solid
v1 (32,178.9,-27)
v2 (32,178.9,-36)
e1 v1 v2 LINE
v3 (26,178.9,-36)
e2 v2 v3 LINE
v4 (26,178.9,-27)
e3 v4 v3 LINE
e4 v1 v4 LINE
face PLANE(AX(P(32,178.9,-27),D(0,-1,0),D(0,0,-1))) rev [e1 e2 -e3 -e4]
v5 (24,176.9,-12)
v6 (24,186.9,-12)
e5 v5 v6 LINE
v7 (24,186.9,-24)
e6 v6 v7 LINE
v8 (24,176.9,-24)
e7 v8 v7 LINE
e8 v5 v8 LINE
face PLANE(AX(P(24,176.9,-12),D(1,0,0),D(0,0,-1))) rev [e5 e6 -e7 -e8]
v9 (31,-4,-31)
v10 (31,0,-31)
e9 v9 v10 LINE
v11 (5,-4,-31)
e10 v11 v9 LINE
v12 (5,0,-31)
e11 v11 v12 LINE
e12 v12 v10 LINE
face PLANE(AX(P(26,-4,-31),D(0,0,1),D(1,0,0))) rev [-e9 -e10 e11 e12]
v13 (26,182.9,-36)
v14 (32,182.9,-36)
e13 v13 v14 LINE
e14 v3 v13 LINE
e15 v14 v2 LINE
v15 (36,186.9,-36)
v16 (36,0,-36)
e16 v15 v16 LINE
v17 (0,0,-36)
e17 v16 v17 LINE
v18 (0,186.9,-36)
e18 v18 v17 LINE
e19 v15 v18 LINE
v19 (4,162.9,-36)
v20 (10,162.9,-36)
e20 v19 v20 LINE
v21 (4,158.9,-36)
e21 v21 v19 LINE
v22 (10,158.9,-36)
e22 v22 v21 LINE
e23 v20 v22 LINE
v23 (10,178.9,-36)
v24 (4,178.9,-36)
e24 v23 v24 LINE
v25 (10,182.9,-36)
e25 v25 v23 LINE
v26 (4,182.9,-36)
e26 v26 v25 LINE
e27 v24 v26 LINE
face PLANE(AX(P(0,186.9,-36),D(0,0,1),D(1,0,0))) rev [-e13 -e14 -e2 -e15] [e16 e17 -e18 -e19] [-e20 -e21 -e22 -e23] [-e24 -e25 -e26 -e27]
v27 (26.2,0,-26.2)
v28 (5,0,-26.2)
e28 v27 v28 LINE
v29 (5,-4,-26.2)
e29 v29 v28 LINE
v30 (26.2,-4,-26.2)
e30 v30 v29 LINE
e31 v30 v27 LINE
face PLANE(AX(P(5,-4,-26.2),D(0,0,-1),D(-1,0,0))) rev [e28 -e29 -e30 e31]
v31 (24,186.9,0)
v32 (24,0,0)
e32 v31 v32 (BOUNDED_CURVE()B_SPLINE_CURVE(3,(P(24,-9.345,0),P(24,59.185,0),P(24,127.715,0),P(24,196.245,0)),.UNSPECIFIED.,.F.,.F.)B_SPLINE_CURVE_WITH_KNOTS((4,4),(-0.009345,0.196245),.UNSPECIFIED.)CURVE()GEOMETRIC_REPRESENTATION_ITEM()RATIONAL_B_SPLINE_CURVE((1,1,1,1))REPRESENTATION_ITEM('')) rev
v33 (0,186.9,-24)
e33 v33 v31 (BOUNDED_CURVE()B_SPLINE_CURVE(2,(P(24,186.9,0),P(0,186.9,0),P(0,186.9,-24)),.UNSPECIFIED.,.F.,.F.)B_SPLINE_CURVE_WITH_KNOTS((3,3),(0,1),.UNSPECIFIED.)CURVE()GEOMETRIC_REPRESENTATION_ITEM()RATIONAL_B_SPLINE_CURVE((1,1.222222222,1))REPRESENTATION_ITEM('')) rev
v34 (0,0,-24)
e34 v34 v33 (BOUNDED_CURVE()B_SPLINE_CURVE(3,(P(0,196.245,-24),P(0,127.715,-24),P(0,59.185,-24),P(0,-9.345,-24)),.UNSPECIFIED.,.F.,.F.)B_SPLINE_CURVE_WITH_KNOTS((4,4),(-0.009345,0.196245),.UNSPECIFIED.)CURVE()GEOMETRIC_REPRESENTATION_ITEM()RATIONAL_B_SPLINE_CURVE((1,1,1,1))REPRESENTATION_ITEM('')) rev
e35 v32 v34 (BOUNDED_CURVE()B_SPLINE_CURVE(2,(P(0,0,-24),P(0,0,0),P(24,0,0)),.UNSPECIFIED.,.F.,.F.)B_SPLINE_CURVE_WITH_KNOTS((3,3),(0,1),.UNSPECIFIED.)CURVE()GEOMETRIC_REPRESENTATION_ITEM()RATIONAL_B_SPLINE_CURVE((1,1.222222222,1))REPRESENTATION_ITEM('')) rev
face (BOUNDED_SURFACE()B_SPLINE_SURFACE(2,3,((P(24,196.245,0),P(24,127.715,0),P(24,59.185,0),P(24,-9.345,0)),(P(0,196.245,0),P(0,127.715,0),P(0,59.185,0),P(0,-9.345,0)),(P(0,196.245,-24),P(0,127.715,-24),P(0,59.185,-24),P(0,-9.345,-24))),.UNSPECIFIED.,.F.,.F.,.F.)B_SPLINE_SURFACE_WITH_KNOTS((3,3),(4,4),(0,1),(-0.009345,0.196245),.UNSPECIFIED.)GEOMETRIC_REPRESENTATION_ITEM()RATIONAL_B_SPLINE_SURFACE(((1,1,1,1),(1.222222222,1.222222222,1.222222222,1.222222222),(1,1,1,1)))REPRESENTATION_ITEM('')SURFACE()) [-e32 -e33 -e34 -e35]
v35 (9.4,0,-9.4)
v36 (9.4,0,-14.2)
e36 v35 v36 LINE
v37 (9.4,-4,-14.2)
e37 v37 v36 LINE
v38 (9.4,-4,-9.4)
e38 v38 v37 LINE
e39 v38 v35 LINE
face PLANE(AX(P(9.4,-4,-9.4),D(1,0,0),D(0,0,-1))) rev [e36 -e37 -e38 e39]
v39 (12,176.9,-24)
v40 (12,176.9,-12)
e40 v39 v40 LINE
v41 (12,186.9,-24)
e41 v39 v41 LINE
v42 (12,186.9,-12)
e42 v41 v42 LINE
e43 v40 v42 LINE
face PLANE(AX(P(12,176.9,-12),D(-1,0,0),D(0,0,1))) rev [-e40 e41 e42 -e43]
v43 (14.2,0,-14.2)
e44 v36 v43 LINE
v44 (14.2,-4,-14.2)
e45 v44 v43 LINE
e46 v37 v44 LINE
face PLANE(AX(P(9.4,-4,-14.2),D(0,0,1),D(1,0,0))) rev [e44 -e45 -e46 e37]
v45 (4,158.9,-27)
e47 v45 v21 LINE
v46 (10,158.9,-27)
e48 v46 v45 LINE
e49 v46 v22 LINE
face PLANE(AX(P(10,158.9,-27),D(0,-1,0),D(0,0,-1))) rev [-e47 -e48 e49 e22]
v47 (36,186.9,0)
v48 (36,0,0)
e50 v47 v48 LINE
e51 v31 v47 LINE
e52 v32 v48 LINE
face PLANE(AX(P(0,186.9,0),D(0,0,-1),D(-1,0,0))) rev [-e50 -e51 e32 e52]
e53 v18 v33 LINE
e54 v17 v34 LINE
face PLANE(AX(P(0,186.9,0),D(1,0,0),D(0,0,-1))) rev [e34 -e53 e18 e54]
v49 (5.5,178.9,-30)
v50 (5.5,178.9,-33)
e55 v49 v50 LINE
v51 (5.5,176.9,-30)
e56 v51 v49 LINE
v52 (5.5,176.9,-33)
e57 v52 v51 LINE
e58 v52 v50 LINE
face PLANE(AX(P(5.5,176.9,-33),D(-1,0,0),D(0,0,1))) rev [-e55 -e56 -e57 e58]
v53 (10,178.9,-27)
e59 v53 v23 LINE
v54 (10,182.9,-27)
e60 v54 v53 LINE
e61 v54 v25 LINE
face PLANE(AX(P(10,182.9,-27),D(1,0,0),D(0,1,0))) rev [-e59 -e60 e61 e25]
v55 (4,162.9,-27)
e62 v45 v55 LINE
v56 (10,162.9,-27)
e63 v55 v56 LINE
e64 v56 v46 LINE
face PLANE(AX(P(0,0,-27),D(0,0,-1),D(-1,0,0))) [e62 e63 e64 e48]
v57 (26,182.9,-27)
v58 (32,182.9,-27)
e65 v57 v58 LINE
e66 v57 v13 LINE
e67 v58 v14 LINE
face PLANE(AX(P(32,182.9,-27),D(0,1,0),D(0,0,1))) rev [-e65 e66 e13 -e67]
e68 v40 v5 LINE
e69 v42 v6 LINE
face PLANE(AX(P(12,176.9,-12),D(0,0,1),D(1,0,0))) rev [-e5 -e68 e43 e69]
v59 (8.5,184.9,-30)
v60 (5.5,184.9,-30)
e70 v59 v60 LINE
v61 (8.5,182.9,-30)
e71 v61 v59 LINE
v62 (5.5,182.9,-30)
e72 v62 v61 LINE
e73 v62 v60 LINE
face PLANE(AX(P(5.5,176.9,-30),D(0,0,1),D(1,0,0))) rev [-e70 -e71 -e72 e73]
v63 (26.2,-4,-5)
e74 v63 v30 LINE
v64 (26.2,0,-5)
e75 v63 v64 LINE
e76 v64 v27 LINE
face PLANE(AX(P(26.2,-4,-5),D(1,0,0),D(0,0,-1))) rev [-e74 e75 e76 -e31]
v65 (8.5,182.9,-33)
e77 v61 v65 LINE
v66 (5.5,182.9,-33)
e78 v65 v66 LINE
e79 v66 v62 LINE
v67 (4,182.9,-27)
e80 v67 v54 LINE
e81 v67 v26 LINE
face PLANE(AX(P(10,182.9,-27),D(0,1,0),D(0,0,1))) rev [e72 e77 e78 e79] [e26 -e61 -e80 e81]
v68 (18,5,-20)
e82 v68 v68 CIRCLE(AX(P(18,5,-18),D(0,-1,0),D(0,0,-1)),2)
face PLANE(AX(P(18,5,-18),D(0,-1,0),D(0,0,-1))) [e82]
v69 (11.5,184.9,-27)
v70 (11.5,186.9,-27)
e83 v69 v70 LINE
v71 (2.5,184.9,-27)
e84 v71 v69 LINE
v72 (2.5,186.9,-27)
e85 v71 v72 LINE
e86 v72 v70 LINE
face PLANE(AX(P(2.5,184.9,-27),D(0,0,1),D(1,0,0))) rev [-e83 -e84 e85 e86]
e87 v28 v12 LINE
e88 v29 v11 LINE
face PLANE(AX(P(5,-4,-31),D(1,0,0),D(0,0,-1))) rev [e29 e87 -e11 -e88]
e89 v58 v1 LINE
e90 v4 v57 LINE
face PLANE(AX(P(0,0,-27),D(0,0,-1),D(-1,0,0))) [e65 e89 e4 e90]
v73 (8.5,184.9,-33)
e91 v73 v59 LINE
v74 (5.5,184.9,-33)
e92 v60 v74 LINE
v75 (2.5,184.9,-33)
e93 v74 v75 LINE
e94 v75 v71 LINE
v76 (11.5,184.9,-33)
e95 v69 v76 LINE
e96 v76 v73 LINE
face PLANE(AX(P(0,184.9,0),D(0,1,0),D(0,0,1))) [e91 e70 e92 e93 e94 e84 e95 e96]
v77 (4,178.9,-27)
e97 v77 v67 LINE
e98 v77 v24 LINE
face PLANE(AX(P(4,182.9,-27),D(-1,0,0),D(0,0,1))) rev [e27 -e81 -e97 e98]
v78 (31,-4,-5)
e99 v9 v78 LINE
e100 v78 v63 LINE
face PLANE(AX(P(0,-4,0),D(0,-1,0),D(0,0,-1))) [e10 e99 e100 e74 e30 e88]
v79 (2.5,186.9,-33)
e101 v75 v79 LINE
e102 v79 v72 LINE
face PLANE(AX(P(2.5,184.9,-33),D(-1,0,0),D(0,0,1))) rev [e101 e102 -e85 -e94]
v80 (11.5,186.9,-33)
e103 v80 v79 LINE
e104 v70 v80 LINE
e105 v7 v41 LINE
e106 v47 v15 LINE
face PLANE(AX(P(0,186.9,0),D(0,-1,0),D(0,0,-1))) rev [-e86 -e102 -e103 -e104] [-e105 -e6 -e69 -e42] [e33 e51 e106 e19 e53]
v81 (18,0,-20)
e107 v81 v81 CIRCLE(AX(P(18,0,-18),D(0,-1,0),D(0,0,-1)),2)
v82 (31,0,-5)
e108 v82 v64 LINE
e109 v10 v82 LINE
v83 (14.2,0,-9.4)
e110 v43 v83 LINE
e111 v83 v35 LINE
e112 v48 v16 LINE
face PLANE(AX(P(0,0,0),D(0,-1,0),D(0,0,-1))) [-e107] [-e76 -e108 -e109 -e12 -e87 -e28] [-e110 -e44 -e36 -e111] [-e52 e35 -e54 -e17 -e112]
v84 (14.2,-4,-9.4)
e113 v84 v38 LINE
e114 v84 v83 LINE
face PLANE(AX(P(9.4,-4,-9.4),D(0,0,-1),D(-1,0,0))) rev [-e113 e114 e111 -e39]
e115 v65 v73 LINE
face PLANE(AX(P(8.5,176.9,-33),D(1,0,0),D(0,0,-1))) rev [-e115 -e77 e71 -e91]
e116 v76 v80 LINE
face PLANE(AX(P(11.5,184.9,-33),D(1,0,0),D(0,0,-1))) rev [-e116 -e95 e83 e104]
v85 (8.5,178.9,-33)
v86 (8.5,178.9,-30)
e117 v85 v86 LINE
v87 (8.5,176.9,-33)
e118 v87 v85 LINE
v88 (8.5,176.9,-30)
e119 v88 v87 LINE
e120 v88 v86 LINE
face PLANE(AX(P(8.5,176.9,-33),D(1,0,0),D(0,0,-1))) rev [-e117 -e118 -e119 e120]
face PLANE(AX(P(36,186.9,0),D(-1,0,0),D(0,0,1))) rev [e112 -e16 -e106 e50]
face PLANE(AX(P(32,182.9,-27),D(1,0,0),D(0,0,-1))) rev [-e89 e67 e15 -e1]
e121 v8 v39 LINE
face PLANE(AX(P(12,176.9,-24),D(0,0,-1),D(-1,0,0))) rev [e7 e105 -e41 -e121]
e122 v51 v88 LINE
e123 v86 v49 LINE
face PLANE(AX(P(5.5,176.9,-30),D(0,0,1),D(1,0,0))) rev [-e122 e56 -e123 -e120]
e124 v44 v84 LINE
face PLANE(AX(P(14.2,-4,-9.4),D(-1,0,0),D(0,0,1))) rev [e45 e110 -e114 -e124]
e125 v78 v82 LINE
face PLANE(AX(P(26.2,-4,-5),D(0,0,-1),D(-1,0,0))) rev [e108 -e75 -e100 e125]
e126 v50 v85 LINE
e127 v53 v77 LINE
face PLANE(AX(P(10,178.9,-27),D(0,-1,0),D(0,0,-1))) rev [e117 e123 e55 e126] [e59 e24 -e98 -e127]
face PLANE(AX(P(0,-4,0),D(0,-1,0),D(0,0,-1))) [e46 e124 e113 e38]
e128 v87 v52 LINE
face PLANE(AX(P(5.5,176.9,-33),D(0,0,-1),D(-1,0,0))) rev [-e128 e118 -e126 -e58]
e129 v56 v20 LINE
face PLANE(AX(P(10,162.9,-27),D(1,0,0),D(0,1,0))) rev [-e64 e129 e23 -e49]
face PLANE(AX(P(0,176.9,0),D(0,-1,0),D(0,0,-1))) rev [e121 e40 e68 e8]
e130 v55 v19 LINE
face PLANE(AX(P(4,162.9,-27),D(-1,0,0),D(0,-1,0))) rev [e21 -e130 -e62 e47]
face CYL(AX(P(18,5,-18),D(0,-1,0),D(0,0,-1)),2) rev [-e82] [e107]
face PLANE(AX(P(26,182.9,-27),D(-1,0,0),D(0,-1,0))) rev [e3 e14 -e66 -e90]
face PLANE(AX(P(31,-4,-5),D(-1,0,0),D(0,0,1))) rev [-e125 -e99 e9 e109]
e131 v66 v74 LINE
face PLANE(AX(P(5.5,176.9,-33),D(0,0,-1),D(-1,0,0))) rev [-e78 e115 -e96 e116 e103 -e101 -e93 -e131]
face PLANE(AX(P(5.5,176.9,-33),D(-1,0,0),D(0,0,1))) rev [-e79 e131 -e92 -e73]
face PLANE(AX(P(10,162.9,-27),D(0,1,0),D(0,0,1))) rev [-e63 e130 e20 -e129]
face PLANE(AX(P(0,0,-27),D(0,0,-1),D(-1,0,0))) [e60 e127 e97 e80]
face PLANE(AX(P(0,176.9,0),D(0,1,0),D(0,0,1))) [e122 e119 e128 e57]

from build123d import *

# Parameters (mm, degrees)
SKETCH1_W           = 36
SKETCH1_H           = 36
BOSS_EXTRUDE1_DEPTH = 186.9
FILLET1_SIZE        = 24
SKETCH2_R           = 2
CUT_EXTRUDE1_DEPTH  = 5
SKETCH3_W           = 4.8
SKETCH3_H           = 4.8
BOSS_EXTRUDE2_DEPTH = 4
SKETCH4_W           = 6
SKETCH4_H           = 4
CUT_EXTRUDE2_DEPTH  = 9
SKETCH5_W           = 3
SKETCH5_H           = 3
SKETCH5_W_2         = 12
SKETCH5_H_2         = 12
CUT_EXTRUDE3_DEPTH  = 10
SKETCH6_W           = 9
SKETCH6_H           = 6
CUT_EXTRUDE4_DEPTH  = 2


with BuildPart() as part:
    # Sketch1 → Boss-Extrude1 (new body)
    with BuildSketch(Plane(origin=(0, 0, 0), x_dir=(1, 0, 0), z_dir=(0, 1, 0))):
        with Locations((18, 18)):
            Rectangle(SKETCH1_W, SKETCH1_H)
    extrude(amount=BOSS_EXTRUDE1_DEPTH)

    # Fillet1
    # a fillet whose section is not a circle: 24 mm, written as the material it takes off along each edge
    with BuildSketch(Plane(origin=(0, -60, 0), x_dir=(1, 0, 0), z_dir=(0, 1, 0))) as fillet1_piece_1:
        with BuildLine():
            Bezier((FILLET1_SIZE, 0), (0, 0), (0, FILLET1_SIZE), weights=[1, 1.222222222, 1])
            Line((0, FILLET1_SIZE), (0, 0))
            Line((0, 0), (FILLET1_SIZE, 0))
        make_face()
    extrude(amount=306.9, mode=Mode.SUBTRACT)

    # Sketch2 → Cut-Extrude1 (cut)
    with BuildSketch(Plane.XZ):
        with Locations(Location((18, -18, 0), (0, 0, 270))):
            Circle(SKETCH2_R)
    extrude(amount=-CUT_EXTRUDE1_DEPTH, mode=Mode.SUBTRACT)

    # Sketch3 → Boss-Extrude2 (add)
    with BuildSketch(Plane.XZ):
        Polygon((26.2, -5), (31, -5), (31, -31), (26, -31), (5, -31), (5, -26.2), (26.2, -26.2), align=None)
        with Locations((11.8, -11.8)):
            Rectangle(SKETCH3_W, SKETCH3_H)
    extrude(amount=BOSS_EXTRUDE2_DEPTH)

    # Sketch4 → Cut-Extrude2 (cut)
    with BuildSketch(Plane(origin=(0, 0, -36), x_dir=(-1, 0, 0), z_dir=(0, 0, -1))):
        with Locations((-7, 180.9)):
            Rectangle(SKETCH4_W, SKETCH4_H)
        with Locations((-29, 180.9)):
            Rectangle(SKETCH4_W, SKETCH4_H)
        with Locations((-7, 160.9)):
            Rectangle(SKETCH4_W, SKETCH4_H)
    extrude(amount=-CUT_EXTRUDE2_DEPTH, mode=Mode.SUBTRACT)

    # Sketch5 → Cut-Extrude3 (cut)
    with BuildSketch(Plane(origin=(0, 186.9, 0), x_dir=(1, 0, 0), z_dir=(0, 1, 0))):
        with Locations((7, 31.5)):
            Rectangle(SKETCH5_W, SKETCH5_H)
        with Locations((18, 18)):
            Rectangle(SKETCH5_W_2, SKETCH5_H_2)
    extrude(amount=-CUT_EXTRUDE3_DEPTH, mode=Mode.SUBTRACT)

    # Sketch6 → Cut-Extrude4 (cut)
    with BuildSketch(Plane(origin=(0, 186.9, 0), x_dir=(1, 0, 0), z_dir=(0, 1, 0))):
        with Locations((7, 30)):
            Rectangle(SKETCH6_W, SKETCH6_H)
    extrude(amount=-CUT_EXTRUDE4_DEPTH, mode=Mode.SUBTRACT)


solid = part.part
